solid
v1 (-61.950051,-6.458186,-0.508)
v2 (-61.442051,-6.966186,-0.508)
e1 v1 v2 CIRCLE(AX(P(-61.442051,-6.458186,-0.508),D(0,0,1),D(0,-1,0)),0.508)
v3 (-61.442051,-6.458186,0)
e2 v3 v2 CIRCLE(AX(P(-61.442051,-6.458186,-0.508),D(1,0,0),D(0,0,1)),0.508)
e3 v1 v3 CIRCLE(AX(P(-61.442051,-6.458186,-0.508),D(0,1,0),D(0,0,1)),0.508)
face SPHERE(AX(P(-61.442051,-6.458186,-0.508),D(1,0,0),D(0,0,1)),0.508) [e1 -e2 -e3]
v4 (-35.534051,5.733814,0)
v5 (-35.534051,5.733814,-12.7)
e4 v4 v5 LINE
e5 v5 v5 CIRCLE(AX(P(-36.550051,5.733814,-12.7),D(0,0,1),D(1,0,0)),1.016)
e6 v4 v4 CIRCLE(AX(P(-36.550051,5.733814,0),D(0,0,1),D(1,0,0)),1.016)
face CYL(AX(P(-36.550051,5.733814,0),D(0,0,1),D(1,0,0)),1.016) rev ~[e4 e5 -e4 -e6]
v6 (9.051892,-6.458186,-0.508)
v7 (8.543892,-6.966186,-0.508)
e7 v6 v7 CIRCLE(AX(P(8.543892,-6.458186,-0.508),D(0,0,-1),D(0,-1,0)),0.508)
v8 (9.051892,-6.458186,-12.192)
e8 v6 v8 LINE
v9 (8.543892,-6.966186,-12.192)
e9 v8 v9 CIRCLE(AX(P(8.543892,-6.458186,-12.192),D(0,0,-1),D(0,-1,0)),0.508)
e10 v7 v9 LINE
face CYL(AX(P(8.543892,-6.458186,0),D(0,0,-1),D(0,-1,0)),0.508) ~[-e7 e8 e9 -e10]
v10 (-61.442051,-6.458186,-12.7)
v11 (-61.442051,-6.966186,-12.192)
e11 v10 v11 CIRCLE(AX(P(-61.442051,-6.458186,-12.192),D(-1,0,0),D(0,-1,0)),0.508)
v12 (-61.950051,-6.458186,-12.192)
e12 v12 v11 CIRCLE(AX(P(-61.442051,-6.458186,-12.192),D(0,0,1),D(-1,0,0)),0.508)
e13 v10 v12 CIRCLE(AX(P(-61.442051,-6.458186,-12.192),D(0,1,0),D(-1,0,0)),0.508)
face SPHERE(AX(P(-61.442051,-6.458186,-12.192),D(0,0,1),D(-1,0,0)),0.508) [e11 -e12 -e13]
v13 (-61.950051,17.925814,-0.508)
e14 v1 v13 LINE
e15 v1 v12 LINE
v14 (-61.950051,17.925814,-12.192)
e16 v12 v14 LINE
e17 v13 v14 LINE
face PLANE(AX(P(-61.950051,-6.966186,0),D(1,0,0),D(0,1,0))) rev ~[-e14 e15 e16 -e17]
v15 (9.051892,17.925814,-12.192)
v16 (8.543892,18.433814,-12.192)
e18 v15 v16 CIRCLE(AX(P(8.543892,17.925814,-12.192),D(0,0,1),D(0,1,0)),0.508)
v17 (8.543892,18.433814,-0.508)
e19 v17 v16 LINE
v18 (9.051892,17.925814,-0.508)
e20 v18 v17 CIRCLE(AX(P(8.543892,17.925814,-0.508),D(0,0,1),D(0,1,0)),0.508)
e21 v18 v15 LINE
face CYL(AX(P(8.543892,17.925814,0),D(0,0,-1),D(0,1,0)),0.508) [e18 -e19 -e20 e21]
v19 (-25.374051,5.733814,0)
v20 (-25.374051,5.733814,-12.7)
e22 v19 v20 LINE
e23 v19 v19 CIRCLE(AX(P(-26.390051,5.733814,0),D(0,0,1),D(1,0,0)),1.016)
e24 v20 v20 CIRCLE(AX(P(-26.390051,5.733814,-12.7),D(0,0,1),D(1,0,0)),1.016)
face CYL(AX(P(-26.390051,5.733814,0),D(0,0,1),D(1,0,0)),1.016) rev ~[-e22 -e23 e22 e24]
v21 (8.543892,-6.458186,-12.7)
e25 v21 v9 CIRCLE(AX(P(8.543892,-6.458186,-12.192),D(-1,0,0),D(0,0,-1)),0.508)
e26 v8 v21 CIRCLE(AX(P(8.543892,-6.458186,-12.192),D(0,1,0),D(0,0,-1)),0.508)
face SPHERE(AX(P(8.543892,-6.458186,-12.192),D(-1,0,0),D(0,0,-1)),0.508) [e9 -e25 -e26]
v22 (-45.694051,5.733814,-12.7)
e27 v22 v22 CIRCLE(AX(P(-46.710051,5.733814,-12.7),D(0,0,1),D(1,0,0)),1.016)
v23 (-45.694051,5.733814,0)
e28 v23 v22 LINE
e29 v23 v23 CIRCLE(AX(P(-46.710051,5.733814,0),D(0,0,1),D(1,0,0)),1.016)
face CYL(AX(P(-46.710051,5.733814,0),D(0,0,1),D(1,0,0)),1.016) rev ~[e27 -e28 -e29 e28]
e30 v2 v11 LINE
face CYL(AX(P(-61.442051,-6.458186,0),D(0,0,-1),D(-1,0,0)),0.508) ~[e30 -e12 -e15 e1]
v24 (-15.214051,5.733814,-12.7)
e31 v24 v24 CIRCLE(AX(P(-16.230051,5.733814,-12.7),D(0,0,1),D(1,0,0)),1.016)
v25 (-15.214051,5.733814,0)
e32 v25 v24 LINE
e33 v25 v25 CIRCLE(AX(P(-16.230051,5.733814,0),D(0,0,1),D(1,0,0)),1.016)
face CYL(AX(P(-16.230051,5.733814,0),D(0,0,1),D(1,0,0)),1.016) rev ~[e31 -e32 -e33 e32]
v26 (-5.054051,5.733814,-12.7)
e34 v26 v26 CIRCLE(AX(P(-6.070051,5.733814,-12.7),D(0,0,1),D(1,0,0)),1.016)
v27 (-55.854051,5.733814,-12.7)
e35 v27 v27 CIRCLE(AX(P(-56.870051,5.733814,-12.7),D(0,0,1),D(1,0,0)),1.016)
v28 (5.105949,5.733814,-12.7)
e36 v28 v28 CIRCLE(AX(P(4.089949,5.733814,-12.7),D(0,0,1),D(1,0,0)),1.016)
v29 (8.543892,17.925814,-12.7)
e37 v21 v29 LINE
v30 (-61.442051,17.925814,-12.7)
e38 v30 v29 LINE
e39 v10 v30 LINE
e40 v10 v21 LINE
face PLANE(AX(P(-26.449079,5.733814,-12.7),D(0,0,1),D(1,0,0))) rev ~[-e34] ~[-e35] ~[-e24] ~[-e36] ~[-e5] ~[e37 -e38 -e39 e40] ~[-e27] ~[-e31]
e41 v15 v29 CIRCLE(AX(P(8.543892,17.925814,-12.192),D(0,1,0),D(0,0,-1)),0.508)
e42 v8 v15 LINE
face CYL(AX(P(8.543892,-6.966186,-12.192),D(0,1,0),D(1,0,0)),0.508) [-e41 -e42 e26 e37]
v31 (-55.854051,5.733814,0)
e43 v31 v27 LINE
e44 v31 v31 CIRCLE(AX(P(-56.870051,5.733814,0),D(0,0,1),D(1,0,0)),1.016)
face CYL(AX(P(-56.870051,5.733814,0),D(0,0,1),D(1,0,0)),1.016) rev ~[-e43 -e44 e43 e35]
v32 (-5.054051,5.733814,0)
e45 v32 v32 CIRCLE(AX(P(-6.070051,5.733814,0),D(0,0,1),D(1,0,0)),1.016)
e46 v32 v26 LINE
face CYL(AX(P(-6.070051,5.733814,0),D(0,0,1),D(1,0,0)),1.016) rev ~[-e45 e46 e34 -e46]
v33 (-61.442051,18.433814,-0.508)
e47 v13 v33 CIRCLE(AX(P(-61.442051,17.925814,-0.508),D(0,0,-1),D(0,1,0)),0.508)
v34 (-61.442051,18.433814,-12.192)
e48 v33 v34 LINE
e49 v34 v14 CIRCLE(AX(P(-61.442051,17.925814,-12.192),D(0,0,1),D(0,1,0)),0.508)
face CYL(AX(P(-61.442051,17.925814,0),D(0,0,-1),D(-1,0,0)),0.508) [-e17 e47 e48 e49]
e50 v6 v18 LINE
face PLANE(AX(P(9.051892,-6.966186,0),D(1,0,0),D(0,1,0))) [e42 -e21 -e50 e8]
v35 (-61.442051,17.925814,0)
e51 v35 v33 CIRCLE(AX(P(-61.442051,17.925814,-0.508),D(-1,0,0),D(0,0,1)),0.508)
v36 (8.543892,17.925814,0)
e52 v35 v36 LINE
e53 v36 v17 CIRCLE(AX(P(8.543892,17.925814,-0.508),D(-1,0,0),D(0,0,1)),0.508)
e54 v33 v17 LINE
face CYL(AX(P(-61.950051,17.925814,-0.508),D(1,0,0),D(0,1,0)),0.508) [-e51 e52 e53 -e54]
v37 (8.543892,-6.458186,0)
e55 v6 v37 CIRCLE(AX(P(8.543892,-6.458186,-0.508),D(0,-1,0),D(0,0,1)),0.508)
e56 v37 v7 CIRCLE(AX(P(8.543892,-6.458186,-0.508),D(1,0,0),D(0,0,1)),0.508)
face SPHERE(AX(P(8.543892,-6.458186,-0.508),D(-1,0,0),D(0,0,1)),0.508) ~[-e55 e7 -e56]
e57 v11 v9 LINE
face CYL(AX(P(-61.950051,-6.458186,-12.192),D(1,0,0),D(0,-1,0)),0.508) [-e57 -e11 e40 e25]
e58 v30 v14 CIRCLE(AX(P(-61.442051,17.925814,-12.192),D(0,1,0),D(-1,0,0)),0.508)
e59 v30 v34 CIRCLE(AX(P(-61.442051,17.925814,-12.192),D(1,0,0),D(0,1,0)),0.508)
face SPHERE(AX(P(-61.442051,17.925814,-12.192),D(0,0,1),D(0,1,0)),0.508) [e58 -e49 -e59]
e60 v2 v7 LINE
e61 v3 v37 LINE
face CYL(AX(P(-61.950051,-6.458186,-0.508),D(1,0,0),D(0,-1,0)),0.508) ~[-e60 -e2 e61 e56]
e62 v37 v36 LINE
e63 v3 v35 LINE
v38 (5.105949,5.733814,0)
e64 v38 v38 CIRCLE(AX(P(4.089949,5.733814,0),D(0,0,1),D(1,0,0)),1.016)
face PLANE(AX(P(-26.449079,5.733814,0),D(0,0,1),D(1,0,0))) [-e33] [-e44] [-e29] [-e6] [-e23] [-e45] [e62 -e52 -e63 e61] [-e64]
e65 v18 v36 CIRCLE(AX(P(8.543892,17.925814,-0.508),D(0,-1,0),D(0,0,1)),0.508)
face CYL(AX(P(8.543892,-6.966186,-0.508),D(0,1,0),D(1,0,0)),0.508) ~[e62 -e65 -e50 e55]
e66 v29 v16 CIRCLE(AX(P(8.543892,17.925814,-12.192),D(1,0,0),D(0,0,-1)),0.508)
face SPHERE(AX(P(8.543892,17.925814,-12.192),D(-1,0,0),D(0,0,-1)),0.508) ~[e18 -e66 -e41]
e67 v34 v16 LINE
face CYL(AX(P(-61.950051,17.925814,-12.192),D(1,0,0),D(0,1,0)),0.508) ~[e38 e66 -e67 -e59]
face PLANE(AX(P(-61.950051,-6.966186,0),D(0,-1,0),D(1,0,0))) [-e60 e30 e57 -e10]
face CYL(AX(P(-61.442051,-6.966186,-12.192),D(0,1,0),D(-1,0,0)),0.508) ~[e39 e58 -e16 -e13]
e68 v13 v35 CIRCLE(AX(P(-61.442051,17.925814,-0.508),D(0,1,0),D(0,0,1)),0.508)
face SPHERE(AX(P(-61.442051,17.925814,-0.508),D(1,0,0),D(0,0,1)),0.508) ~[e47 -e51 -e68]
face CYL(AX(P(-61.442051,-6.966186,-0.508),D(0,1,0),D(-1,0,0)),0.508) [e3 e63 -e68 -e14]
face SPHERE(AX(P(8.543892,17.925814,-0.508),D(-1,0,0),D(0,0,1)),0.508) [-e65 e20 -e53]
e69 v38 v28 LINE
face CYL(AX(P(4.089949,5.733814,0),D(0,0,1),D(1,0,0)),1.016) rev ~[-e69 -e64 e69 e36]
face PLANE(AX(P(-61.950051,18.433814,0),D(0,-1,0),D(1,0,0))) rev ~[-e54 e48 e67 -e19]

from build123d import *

# Parameters (mm, degrees)
F0_W     = 71.0019436256
F0_H     = 25.4
F0_R     = 1.016
F1_DEPTH = 12.7
F2_R     = 0.508


# Not quite as in the source:
# - a feature names something its author has since deleted; it is built from what else it names


with BuildPart() as f1:
    # F0 (on Top) → F1 (new body)
    with BuildSketch(Plane.XY):
        with Locations((-26.4490794038, 5.7338142046)):
            Rectangle(F0_W, F0_H)
        with Locations((-56.8700512166, 5.7338142046)):
            Circle(F0_R, mode=Mode.SUBTRACT)
        with Locations((-46.7100512166, 5.7338142046)):
            Circle(F0_R, mode=Mode.SUBTRACT)
        with Locations((-36.5500512166, 5.7338142046)):
            Circle(F0_R, mode=Mode.SUBTRACT)
        with Locations((-26.3900512166, 5.7338142046)):
            Circle(F0_R, mode=Mode.SUBTRACT)
        with Locations((-16.2300512166, 5.7338142046)):
            Circle(F0_R, mode=Mode.SUBTRACT)
        with Locations((-6.0700512166, 5.7338142046)):
            Circle(F0_R, mode=Mode.SUBTRACT)
        with Locations((4.0899487834, 5.7338142046)):
            Circle(F0_R, mode=Mode.SUBTRACT)
    extrude(amount=-F1_DEPTH)

    # F2
    f2_edges = [f1.edges().sort_by_distance(p)[0] for p in [
        (-26.449079, 18.433814, 0),
        (-26.449079, -6.966186, 0),
        (-61.950051, 5.733814, 0),
        (-61.950051, -6.966186, -6.35),
        (-61.950051, 18.433814, -6.35),
        (-26.449079, 18.433814, -12.7),
        (-61.950051, 5.733814, -12.7),
        (-26.449079, -6.966186, -12.7),
        (9.051892, 5.733814, -12.7),
        (9.051892, 5.733814, 0),
        (9.051892, 18.433814, -6.35),
        (9.051892, -6.966186, -6.35),
    ]]
    fillet(f2_edges, radius=F2_R)


solid = f1.part
